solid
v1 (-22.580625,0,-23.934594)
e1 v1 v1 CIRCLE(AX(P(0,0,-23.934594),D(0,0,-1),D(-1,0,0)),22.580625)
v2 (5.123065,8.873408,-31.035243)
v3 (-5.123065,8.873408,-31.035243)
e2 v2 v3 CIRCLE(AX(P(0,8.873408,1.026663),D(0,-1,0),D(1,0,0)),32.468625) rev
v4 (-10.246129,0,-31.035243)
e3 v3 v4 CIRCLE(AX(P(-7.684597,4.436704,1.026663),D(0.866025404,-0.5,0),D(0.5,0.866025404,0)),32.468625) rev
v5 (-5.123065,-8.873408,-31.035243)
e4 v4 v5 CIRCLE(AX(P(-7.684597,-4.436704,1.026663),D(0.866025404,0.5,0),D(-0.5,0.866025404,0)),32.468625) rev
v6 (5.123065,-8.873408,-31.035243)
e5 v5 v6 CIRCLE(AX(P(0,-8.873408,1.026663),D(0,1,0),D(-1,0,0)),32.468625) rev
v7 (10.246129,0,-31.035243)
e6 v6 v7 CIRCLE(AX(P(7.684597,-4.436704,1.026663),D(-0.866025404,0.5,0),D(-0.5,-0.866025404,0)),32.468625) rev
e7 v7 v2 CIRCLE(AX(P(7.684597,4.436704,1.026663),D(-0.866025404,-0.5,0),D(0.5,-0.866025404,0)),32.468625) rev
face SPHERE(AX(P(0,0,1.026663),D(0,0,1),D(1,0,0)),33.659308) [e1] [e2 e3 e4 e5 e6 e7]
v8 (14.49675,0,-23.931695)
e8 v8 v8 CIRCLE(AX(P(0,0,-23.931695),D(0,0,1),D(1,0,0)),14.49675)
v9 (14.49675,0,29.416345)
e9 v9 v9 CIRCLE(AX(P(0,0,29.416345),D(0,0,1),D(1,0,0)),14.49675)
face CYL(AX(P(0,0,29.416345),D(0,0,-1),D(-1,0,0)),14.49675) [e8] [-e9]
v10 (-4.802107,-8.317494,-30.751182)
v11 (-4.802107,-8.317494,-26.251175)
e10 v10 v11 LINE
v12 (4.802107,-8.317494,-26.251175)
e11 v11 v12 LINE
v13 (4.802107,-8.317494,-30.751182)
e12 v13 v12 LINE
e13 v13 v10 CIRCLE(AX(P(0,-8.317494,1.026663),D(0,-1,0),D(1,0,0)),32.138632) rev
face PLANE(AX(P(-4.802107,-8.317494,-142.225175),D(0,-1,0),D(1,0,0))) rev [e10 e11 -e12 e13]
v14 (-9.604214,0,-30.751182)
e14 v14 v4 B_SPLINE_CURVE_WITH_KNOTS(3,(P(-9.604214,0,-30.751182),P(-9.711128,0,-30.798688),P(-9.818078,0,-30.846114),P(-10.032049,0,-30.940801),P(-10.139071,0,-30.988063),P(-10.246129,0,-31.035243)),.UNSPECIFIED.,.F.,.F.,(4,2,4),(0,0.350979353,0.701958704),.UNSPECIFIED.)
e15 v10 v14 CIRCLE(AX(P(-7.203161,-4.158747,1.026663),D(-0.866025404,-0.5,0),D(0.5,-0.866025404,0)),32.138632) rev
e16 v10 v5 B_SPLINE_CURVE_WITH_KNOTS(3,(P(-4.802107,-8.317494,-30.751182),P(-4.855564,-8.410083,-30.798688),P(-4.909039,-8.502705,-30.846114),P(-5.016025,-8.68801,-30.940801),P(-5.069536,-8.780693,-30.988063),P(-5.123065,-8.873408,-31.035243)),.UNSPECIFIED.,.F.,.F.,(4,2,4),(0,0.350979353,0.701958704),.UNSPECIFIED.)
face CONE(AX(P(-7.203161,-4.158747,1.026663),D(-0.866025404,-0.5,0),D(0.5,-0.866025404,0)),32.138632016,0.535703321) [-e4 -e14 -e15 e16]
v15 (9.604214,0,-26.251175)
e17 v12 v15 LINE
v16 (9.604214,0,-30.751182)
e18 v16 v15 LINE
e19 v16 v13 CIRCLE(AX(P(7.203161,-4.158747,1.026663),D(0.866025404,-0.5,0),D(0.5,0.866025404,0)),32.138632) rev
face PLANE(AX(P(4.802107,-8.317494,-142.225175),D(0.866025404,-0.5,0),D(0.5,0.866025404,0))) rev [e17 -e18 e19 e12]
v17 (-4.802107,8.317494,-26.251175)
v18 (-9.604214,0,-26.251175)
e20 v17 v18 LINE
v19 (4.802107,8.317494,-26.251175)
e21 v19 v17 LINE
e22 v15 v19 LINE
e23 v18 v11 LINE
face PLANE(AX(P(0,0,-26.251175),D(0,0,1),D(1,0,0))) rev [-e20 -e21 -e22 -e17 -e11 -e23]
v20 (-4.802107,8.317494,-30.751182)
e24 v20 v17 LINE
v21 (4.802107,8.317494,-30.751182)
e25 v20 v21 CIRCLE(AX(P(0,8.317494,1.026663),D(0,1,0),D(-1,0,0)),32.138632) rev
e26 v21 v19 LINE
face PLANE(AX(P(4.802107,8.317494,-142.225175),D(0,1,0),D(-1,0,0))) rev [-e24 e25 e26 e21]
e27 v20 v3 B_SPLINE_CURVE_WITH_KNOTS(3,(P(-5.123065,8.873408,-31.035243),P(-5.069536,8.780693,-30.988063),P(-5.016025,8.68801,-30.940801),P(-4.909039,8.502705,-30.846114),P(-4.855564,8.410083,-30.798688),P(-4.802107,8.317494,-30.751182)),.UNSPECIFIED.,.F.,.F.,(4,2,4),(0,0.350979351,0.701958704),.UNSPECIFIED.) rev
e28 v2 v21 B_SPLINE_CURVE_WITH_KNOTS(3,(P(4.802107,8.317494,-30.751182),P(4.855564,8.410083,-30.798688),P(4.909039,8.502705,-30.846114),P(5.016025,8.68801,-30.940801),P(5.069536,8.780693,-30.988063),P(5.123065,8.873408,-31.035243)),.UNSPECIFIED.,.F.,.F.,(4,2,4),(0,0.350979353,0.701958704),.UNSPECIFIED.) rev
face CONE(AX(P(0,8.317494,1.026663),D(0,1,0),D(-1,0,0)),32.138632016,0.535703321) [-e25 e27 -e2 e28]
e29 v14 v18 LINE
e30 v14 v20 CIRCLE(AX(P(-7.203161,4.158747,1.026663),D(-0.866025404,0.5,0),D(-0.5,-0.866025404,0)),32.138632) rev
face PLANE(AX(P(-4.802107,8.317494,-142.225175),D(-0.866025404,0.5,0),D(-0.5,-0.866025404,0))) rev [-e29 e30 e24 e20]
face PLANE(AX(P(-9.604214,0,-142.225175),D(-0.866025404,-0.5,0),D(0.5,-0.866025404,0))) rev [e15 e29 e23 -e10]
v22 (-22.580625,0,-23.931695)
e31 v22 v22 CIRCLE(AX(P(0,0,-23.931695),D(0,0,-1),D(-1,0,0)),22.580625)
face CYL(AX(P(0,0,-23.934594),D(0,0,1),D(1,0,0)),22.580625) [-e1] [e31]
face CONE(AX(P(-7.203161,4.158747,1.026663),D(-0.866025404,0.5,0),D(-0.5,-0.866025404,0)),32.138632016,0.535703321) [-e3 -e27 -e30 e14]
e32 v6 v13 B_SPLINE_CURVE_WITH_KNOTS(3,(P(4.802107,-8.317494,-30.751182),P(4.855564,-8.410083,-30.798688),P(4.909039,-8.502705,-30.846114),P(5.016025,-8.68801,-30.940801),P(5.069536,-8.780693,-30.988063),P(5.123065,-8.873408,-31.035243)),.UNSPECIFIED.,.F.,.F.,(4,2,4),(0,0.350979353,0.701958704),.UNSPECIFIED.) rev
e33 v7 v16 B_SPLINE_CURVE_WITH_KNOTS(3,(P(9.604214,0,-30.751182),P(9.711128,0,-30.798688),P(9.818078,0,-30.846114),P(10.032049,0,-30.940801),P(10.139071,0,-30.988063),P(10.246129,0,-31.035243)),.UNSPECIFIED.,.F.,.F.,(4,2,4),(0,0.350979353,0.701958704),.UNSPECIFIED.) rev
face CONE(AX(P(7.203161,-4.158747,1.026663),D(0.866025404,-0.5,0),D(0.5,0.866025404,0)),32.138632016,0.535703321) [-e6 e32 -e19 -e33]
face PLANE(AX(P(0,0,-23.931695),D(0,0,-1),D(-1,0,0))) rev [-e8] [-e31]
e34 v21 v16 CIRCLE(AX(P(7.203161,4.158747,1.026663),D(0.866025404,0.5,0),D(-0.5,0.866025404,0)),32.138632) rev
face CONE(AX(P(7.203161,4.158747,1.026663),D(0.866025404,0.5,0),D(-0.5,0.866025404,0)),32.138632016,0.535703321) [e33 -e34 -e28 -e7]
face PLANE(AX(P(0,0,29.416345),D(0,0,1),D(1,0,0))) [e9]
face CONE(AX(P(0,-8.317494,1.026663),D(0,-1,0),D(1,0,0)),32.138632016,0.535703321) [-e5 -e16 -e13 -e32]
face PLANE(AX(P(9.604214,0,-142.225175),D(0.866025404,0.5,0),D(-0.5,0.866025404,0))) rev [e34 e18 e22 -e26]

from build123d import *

# Parameters (mm, degrees)
SKETCH1_R           = 5
BOSS_EXTRUDE1_DEPTH = 9.2
SKETCH2_R           = 7.788167924
BOSS_EXTRUDE2_DEPTH = 0.001
DOME1_FACE_RADIUS   = 7.788167924
DOME1_HEIGHT        = 3
CUT_EXTRUDE1_START  = -10
CUT_EXTRUDE1_DEPTH  = 40
CHAMFER2_SIZE       = 0.16446068
SCALE1_SCALE        = 1.9329
SCALE2_SCALE        = 1.5


with BuildPart() as part:
    # Sketch1 → Boss-Extrude1 (new, symmetric)
    with BuildSketch(Plane.XY):
        Circle(SKETCH1_R)
    extrude(amount=BOSS_EXTRUDE1_DEPTH, both=True)

    # Sketch2 → Boss-Extrude2 (add)
    with BuildSketch(Plane(origin=(0, 0, -9.2), x_dir=(-1, 0, 0), z_dir=(0, 0, -1))):
        Circle(SKETCH2_R)
    extrude(amount=BOSS_EXTRUDE2_DEPTH)

    # Dome1: a dome of height H over a round flat face of radius A is a cap of a sphere of radius (A * A + H * H) / (2 * H)
    dome1_r = (DOME1_FACE_RADIUS * DOME1_FACE_RADIUS + DOME1_HEIGHT * DOME1_HEIGHT) / (2 * DOME1_HEIGHT)
    dome1_base = Plane((0, 0, -9.201), z_dir=(0, 0, -1))
    with Locations(dome1_base.offset(DOME1_HEIGHT - dome1_r)):
        dome1_ball = Sphere(dome1_r, mode=Mode.PRIVATE)
    add(split(dome1_ball, bisect_by=dome1_base, keep=Keep.TOP, mode=Mode.PRIVATE))

    # Sketch3 → Cut-Extrude1 (cut)
    with BuildSketch(Plane.XY.offset(CUT_EXTRUDE1_START)):
        Polygon((-3.312540498, 0), (-1.656270249, -2.868744223), (1.656270249, -2.868744223), (3.312540498, 0), (1.656270249, 2.868744223), (-1.656270249, 2.868744223), align=None)
    extrude(amount=-CUT_EXTRUDE1_DEPTH, mode=Mode.SUBTRACT)

    # Chamfer2
    # the kernel refuses this chamfer: 0.2, 0.16446068 mm, written as the material it takes off along each edge
    with BuildSketch(Plane(origin=(-2.484405374, -1.434372111, -0.591740065), x_dir=(-0.09595536386249687, 0.16619956546860265, -0.9814123866061929), z_dir=(-0.49070619330309756, 0.8499280583896772, 0.1919107277249933))) as chamfer2_piece_1_section:
        with BuildLine():
            Line((11.198587704, 0.191737716), (11.2492321 - CHAMFER2_SIZE, 0))
            Line((11.2492321 - CHAMFER2_SIZE, 0), (11.2492321, 0))
            ThreePointArc((11.2492321, 0), (11.223603032, 0.098687532), (11.198587704, 0.191737716))
        make_face()
    chamfer2_piece_1 = revolve(axis=Axis((-2.484405374, -1.434372111, -0.591740065), (-0.866025403784438, -0.5000000000000011, 0)), revolution_arc=22.128626255, mode=Mode.PRIVATE)
    chamfer2_piece_1 = split(chamfer2_piece_1, bisect_by=Plane(origin=(-3.726608061, -0.717186056, -0.591740065), z_dir=(0.8660254037844416, -0.499999999999995, 0)), keep=Keep.TOP, mode=Mode.PRIVATE)
    chamfer2_piece_1 = split(chamfer2_piece_1, bisect_by=Plane(origin=(-2.484405374, -2.868744223, -0.591740065), z_dir=(0, 1, 0)), keep=Keep.TOP, mode=Mode.PRIVATE)
    add(chamfer2_piece_1, mode=Mode.SUBTRACT)
    with BuildSketch(Plane(origin=(0, -2.868744223, -0.591740065), x_dir=(-0.1919107277249941, 0, -0.9814123866061928), z_dir=(-0.9814123866061928, -3.420849025073354e-15, 0.1919107277249941))) as chamfer2_piece_2_section:
        with BuildLine():
            Line((11.198587704, 0.191737716), (11.2492321 - CHAMFER2_SIZE, 0))
            Line((11.2492321 - CHAMFER2_SIZE, 0), (11.2492321, 0))
            ThreePointArc((11.2492321, 0), (11.223603032, 0.098687532), (11.198587704, 0.191737716))
        make_face()
    chamfer2_piece_2 = revolve(axis=Axis((0, -2.868744223, -0.591740065), (0, -1, 0)), revolution_arc=22.128626255, mode=Mode.PRIVATE)
    chamfer2_piece_2 = split(chamfer2_piece_2, bisect_by=Plane(origin=(1.242202687, -3.585930278, -0.591740065), z_dir=(-0.8660254037844415, 0.49999999999999506, 0)), keep=Keep.TOP, mode=Mode.PRIVATE)
    chamfer2_piece_2 = split(chamfer2_piece_2, bisect_by=Plane(origin=(-1.242202687, -3.585930278, -0.591740065), z_dir=(0.866025403784438, 0.5000000000000011, 0)), keep=Keep.TOP, mode=Mode.PRIVATE)
    add(chamfer2_piece_2, mode=Mode.SUBTRACT)
    with BuildSketch(Plane(origin=(2.484405374, -1.434372111, -0.591740065), x_dir=(-0.09595536386249569, -0.16619956546860332, -0.9814123866061929), z_dir=(-0.4907061933030916, -0.8499280583896806, 0.1919107277249933))) as chamfer2_piece_3_section:
        with BuildLine():
            Line((11.198587704, 0.191737716), (11.2492321 - CHAMFER2_SIZE, 0))
            Line((11.2492321 - CHAMFER2_SIZE, 0), (11.2492321, 0))
            ThreePointArc((11.2492321, 0), (11.223603032, 0.098687532), (11.198587704, 0.191737716))
        make_face()
    chamfer2_piece_3 = revolve(axis=Axis((2.484405374, -1.434372111, -0.591740065), (0.8660254037844415, -0.49999999999999506, 0)), revolution_arc=22.128626255, mode=Mode.PRIVATE)
    chamfer2_piece_3 = split(chamfer2_piece_3, bisect_by=Plane(origin=(3.726608061, -0.717186056, -0.591740065), z_dir=(-0.8660254037844346, -0.5000000000000072, 0)), keep=Keep.TOP, mode=Mode.PRIVATE)
    chamfer2_piece_3 = split(chamfer2_piece_3, bisect_by=Plane(origin=(2.484405374, -2.868744223, -0.591740065), z_dir=(0, 1, 0)), keep=Keep.TOP, mode=Mode.PRIVATE)
    add(chamfer2_piece_3, mode=Mode.SUBTRACT)
    with BuildSketch(Plane(origin=(2.484405374, 1.434372111, -0.591740065), x_dir=(0.09595536386249802, -0.16619956546860198, -0.9814123866061929), z_dir=(0.49070619330310355, -0.8499280583896739, 0.19191072772499332))) as chamfer2_piece_4_section:
        with BuildLine():
            Line((11.198587704, 0.191737716), (11.2492321 - CHAMFER2_SIZE, 0))
            Line((11.2492321 - CHAMFER2_SIZE, 0), (11.2492321, 0))
            ThreePointArc((11.2492321, 0), (11.223603032, 0.098687532), (11.198587704, 0.191737716))
        make_face()
    chamfer2_piece_4 = revolve(axis=Axis((2.484405374, 1.434372111, -0.591740065), (0.8660254037844346, 0.5000000000000072, 0)), revolution_arc=22.128626255, mode=Mode.PRIVATE)
    chamfer2_piece_4 = split(chamfer2_piece_4, bisect_by=Plane(origin=(2.484405374, 2.868744223, -0.591740065), z_dir=(0, -1, 0)), keep=Keep.TOP, mode=Mode.PRIVATE)
    chamfer2_piece_4 = split(chamfer2_piece_4, bisect_by=Plane(origin=(3.726608061, 0.717186056, -0.591740065), z_dir=(-0.8660254037844415, 0.49999999999999506, 0)), keep=Keep.TOP, mode=Mode.PRIVATE)
    add(chamfer2_piece_4, mode=Mode.SUBTRACT)
    with BuildSketch(Plane(origin=(0, 2.868744223, -0.591740065), x_dir=(0.1919107277249941, 1.9738645532128006e-15, -0.9814123866061928), z_dir=(0.9814123866061928, 1.0130975958871086e-14, 0.1919107277249941))) as chamfer2_piece_5_section:
        with BuildLine():
            Line((11.198587704, 0.191737716), (11.2492321 - CHAMFER2_SIZE, 0))
            Line((11.2492321 - CHAMFER2_SIZE, 0), (11.2492321, 0))
            ThreePointArc((11.2492321, 0), (11.223603032, 0.098687532), (11.198587704, 0.191737716))
        make_face()
    chamfer2_piece_5 = revolve(axis=Axis((0, 2.868744223, -0.591740065), (0, 1, 0)), revolution_arc=22.128626255, mode=Mode.PRIVATE)
    chamfer2_piece_5 = split(chamfer2_piece_5, bisect_by=Plane(origin=(-1.242202687, 3.585930278, -0.591740065), z_dir=(0.8660254037844416, -0.499999999999995, 0)), keep=Keep.TOP, mode=Mode.PRIVATE)
    chamfer2_piece_5 = split(chamfer2_piece_5, bisect_by=Plane(origin=(1.242202687, 3.585930278, -0.591740065), z_dir=(-0.8660254037844346, -0.5000000000000072, 0)), keep=Keep.TOP, mode=Mode.PRIVATE)
    add(chamfer2_piece_5, mode=Mode.SUBTRACT)
    with BuildSketch(Plane(origin=(-2.484405374, 1.434372111, -0.591740065), x_dir=(0.09595536386249523, 0.16619956546860257, -0.981412386606193), z_dir=(0.4907061933030916, 0.8499280583896808, 0.1919107277249924))) as chamfer2_piece_6_section:
        with BuildLine():
            Line((11.198587704, 0.191737716), (11.2492321 - CHAMFER2_SIZE, 0))
            Line((11.2492321 - CHAMFER2_SIZE, 0), (11.2492321, 0))
            ThreePointArc((11.2492321, 0), (11.223603032, 0.098687532), (11.198587704, 0.191737716))
        make_face()
    chamfer2_piece_6 = revolve(axis=Axis((-2.484405374, 1.434372111, -0.591740065), (-0.8660254037844416, 0.499999999999995, 0)), revolution_arc=22.128626255, mode=Mode.PRIVATE)
    chamfer2_piece_6 = split(chamfer2_piece_6, bisect_by=Plane(origin=(-2.484405374, 2.868744223, -0.591740065), z_dir=(0, -1, 0)), keep=Keep.TOP, mode=Mode.PRIVATE)
    chamfer2_piece_6 = split(chamfer2_piece_6, bisect_by=Plane(origin=(-3.726608061, 0.717186056, -0.591740065), z_dir=(0.866025403784438, 0.5000000000000011, 0)), keep=Keep.TOP, mode=Mode.PRIVATE)
    add(chamfer2_piece_6, mode=Mode.SUBTRACT)
    with BuildSketch(Plane(origin=(-2.484405374, 1.434372111, -0.591740065), x_dir=(0.09595536386249523, 0.16619956546860257, -0.981412386606193), z_dir=(0.4907061933030916, 0.8499280583896808, 0.1919107277249924))) as chamfer2_piece_7a_section:
        with BuildLine():
            Line((11.198587704, 0.191737716), (11.2492321 - CHAMFER2_SIZE, 0))
            Line((11.2492321 - CHAMFER2_SIZE, 0), (11.2492321, 0))
            ThreePointArc((11.2492321, 0), (11.223603032, 0.098687532), (11.198587704, 0.191737716))
        make_face()
    chamfer2_piece_7a = revolve(axis=Axis((-2.484405374, 1.434372111, -0.591740065), (-0.8660254037844416, 0.499999999999995, 0)), revolution_arc=22.128626255, mode=Mode.PRIVATE)
    chamfer2_piece_7a = split(chamfer2_piece_7a, bisect_by=Plane(origin=(-3.726608061, 0.717186056, -0.591740065), z_dir=(-0.866025403784438, -0.5000000000000011, 0)), keep=Keep.TOP, mode=Mode.PRIVATE)
    with BuildSketch(Plane(origin=(-2.484405374, -1.434372111, -0.591740065), x_dir=(-0.09595536386249687, 0.16619956546860265, -0.9814123866061929), z_dir=(-0.49070619330309756, 0.8499280583896772, 0.1919107277249933))) as chamfer2_piece_7b_section:
        with BuildLine():
            Line((11.198587704, 0.191737716), (11.2492321 - CHAMFER2_SIZE, 0))
            Line((11.2492321 - CHAMFER2_SIZE, 0), (11.2492321, 0))
            ThreePointArc((11.2492321, 0), (11.223603032, 0.098687532), (11.198587704, 0.191737716))
        make_face()
    chamfer2_piece_7b = revolve(axis=Axis((-2.484405374, -1.434372111, -0.591740065), (-0.866025403784438, -0.5000000000000011, 0)), revolution_arc=22.128626255, mode=Mode.PRIVATE)
    chamfer2_piece_7b = split(chamfer2_piece_7b, bisect_by=Plane(origin=(-3.726608061, -0.717186056, -0.591740065), z_dir=(-0.8660254037844416, 0.499999999999995, 0)), keep=Keep.TOP, mode=Mode.PRIVATE)
    chamfer2_piece_7 = chamfer2_piece_7a & chamfer2_piece_7b
    add(chamfer2_piece_7, mode=Mode.SUBTRACT)
    with BuildSketch(Plane(origin=(0, -2.868744223, -0.591740065), x_dir=(-0.1919107277249941, 0, -0.9814123866061928), z_dir=(-0.9814123866061928, -3.420849025073354e-15, 0.1919107277249941))) as chamfer2_piece_8a_section:
        with BuildLine():
            Line((11.198587704, 0.191737716), (11.2492321 - CHAMFER2_SIZE, 0))
            Line((11.2492321 - CHAMFER2_SIZE, 0), (11.2492321, 0))
            ThreePointArc((11.2492321, 0), (11.223603032, 0.098687532), (11.198587704, 0.191737716))
        make_face()
    chamfer2_piece_8a = revolve(axis=Axis((0, -2.868744223, -0.591740065), (0, -1, 0)), revolution_arc=22.128626255, mode=Mode.PRIVATE)
    chamfer2_piece_8a = split(chamfer2_piece_8a, bisect_by=Plane(origin=(-1.242202687, -3.585930278, -0.591740065), z_dir=(-0.866025403784438, -0.5000000000000011, 0)), keep=Keep.TOP, mode=Mode.PRIVATE)
    with BuildSketch(Plane(origin=(-2.484405374, -1.434372111, -0.591740065), x_dir=(-0.09595536386249687, 0.16619956546860265, -0.9814123866061929), z_dir=(-0.49070619330309756, 0.8499280583896772, 0.1919107277249933))) as chamfer2_piece_8b_section:
        with BuildLine():
            Line((11.198587704, 0.191737716), (11.2492321 - CHAMFER2_SIZE, 0))
            Line((11.2492321 - CHAMFER2_SIZE, 0), (11.2492321, 0))
            ThreePointArc((11.2492321, 0), (11.223603032, 0.098687532), (11.198587704, 0.191737716))
        make_face()
    chamfer2_piece_8b = revolve(axis=Axis((-2.484405374, -1.434372111, -0.591740065), (-0.866025403784438, -0.5000000000000011, 0)), revolution_arc=22.128626255, mode=Mode.PRIVATE)
    chamfer2_piece_8b = split(chamfer2_piece_8b, bisect_by=Plane(origin=(-2.484405374, -2.868744223, -0.591740065), z_dir=(0, -1, 0)), keep=Keep.TOP, mode=Mode.PRIVATE)
    chamfer2_piece_8 = chamfer2_piece_8a & chamfer2_piece_8b
    add(chamfer2_piece_8, mode=Mode.SUBTRACT)
    with BuildSketch(Plane(origin=(2.484405374, -1.434372111, -0.591740065), x_dir=(-0.09595536386249569, -0.16619956546860332, -0.9814123866061929), z_dir=(-0.4907061933030916, -0.8499280583896806, 0.1919107277249933))) as chamfer2_piece_9a_section:
        with BuildLine():
            Line((11.198587704, 0.191737716), (11.2492321 - CHAMFER2_SIZE, 0))
            Line((11.2492321 - CHAMFER2_SIZE, 0), (11.2492321, 0))
            ThreePointArc((11.2492321, 0), (11.223603032, 0.098687532), (11.198587704, 0.191737716))
        make_face()
    chamfer2_piece_9a = revolve(axis=Axis((2.484405374, -1.434372111, -0.591740065), (0.8660254037844415, -0.49999999999999506, 0)), revolution_arc=22.128626255, mode=Mode.PRIVATE)
    chamfer2_piece_9a = split(chamfer2_piece_9a, bisect_by=Plane(origin=(2.484405374, -2.868744223, -0.591740065), z_dir=(0, -1, 0)), keep=Keep.TOP, mode=Mode.PRIVATE)
    with BuildSketch(Plane(origin=(0, -2.868744223, -0.591740065), x_dir=(-0.1919107277249941, 0, -0.9814123866061928), z_dir=(-0.9814123866061928, -3.420849025073354e-15, 0.1919107277249941))) as chamfer2_piece_9b_section:
        with BuildLine():
            Line((11.198587704, 0.191737716), (11.2492321 - CHAMFER2_SIZE, 0))
            Line((11.2492321 - CHAMFER2_SIZE, 0), (11.2492321, 0))
            ThreePointArc((11.2492321, 0), (11.223603032, 0.098687532), (11.198587704, 0.191737716))
        make_face()
    chamfer2_piece_9b = revolve(axis=Axis((0, -2.868744223, -0.591740065), (0, -1, 0)), revolution_arc=22.128626255, mode=Mode.PRIVATE)
    chamfer2_piece_9b = split(chamfer2_piece_9b, bisect_by=Plane(origin=(1.242202687, -3.585930278, -0.591740065), z_dir=(0.8660254037844415, -0.49999999999999506, 0)), keep=Keep.TOP, mode=Mode.PRIVATE)
    chamfer2_piece_9 = chamfer2_piece_9a & chamfer2_piece_9b
    add(chamfer2_piece_9, mode=Mode.SUBTRACT)
    with BuildSketch(Plane(origin=(2.484405374, 1.434372111, -0.591740065), x_dir=(0.09595536386249802, -0.16619956546860198, -0.9814123866061929), z_dir=(0.49070619330310355, -0.8499280583896739, 0.19191072772499332))) as chamfer2_piece_10a_section:
        with BuildLine():
            Line((11.198587704, 0.191737716), (11.2492321 - CHAMFER2_SIZE, 0))
            Line((11.2492321 - CHAMFER2_SIZE, 0), (11.2492321, 0))
            ThreePointArc((11.2492321, 0), (11.223603032, 0.098687532), (11.198587704, 0.191737716))
        make_face()
    chamfer2_piece_10a = revolve(axis=Axis((2.484405374, 1.434372111, -0.591740065), (0.8660254037844346, 0.5000000000000072, 0)), revolution_arc=22.128626255, mode=Mode.PRIVATE)
    chamfer2_piece_10a = split(chamfer2_piece_10a, bisect_by=Plane(origin=(3.726608061, 0.717186056, -0.591740065), z_dir=(0.8660254037844415, -0.49999999999999506, 0)), keep=Keep.TOP, mode=Mode.PRIVATE)
    with BuildSketch(Plane(origin=(2.484405374, -1.434372111, -0.591740065), x_dir=(-0.09595536386249569, -0.16619956546860332, -0.9814123866061929), z_dir=(-0.4907061933030916, -0.8499280583896806, 0.1919107277249933))) as chamfer2_piece_10b_section:
        with BuildLine():
            Line((11.198587704, 0.191737716), (11.2492321 - CHAMFER2_SIZE, 0))
            Line((11.2492321 - CHAMFER2_SIZE, 0), (11.2492321, 0))
            ThreePointArc((11.2492321, 0), (11.223603032, 0.098687532), (11.198587704, 0.191737716))
        make_face()
    chamfer2_piece_10b = revolve(axis=Axis((2.484405374, -1.434372111, -0.591740065), (0.8660254037844415, -0.49999999999999506, 0)), revolution_arc=22.128626255, mode=Mode.PRIVATE)
    chamfer2_piece_10b = split(chamfer2_piece_10b, bisect_by=Plane(origin=(3.726608061, -0.717186056, -0.591740065), z_dir=(0.8660254037844346, 0.5000000000000072, 0)), keep=Keep.TOP, mode=Mode.PRIVATE)
    chamfer2_piece_10 = chamfer2_piece_10a & chamfer2_piece_10b
    add(chamfer2_piece_10, mode=Mode.SUBTRACT)
    with BuildSketch(Plane(origin=(0, 2.868744223, -0.591740065), x_dir=(0.1919107277249941, 1.9738645532128006e-15, -0.9814123866061928), z_dir=(0.9814123866061928, 1.0130975958871086e-14, 0.1919107277249941))) as chamfer2_piece_11a_section:
        with BuildLine():
            Line((11.198587704, 0.191737716), (11.2492321 - CHAMFER2_SIZE, 0))
            Line((11.2492321 - CHAMFER2_SIZE, 0), (11.2492321, 0))
            ThreePointArc((11.2492321, 0), (11.223603032, 0.098687532), (11.198587704, 0.191737716))
        make_face()
    chamfer2_piece_11a = revolve(axis=Axis((0, 2.868744223, -0.591740065), (0, 1, 0)), revolution_arc=22.128626255, mode=Mode.PRIVATE)
    chamfer2_piece_11a = split(chamfer2_piece_11a, bisect_by=Plane(origin=(1.242202687, 3.585930278, -0.591740065), z_dir=(0.8660254037844346, 0.5000000000000072, 0)), keep=Keep.TOP, mode=Mode.PRIVATE)
    with BuildSketch(Plane(origin=(2.484405374, 1.434372111, -0.591740065), x_dir=(0.09595536386249802, -0.16619956546860198, -0.9814123866061929), z_dir=(0.49070619330310355, -0.8499280583896739, 0.19191072772499332))) as chamfer2_piece_11b_section:
        with BuildLine():
            Line((11.198587704, 0.191737716), (11.2492321 - CHAMFER2_SIZE, 0))
            Line((11.2492321 - CHAMFER2_SIZE, 0), (11.2492321, 0))
            ThreePointArc((11.2492321, 0), (11.223603032, 0.098687532), (11.198587704, 0.191737716))
        make_face()
    chamfer2_piece_11b = revolve(axis=Axis((2.484405374, 1.434372111, -0.591740065), (0.8660254037844346, 0.5000000000000072, 0)), revolution_arc=22.128626255, mode=Mode.PRIVATE)
    chamfer2_piece_11b = split(chamfer2_piece_11b, bisect_by=Plane(origin=(2.484405374, 2.868744223, -0.591740065), z_dir=(0, 1, 0)), keep=Keep.TOP, mode=Mode.PRIVATE)
    chamfer2_piece_11 = chamfer2_piece_11a & chamfer2_piece_11b
    add(chamfer2_piece_11, mode=Mode.SUBTRACT)
    with BuildSketch(Plane(origin=(-2.484405374, 1.434372111, -0.591740065), x_dir=(0.09595536386249523, 0.16619956546860257, -0.981412386606193), z_dir=(0.4907061933030916, 0.8499280583896808, 0.1919107277249924))) as chamfer2_piece_12a_section:
        with BuildLine():
            Line((11.198587704, 0.191737716), (11.2492321 - CHAMFER2_SIZE, 0))
            Line((11.2492321 - CHAMFER2_SIZE, 0), (11.2492321, 0))
            ThreePointArc((11.2492321, 0), (11.223603032, 0.098687532), (11.198587704, 0.191737716))
        make_face()
    chamfer2_piece_12a = revolve(axis=Axis((-2.484405374, 1.434372111, -0.591740065), (-0.8660254037844416, 0.499999999999995, 0)), revolution_arc=22.128626255, mode=Mode.PRIVATE)
    chamfer2_piece_12a = split(chamfer2_piece_12a, bisect_by=Plane(origin=(-2.484405374, 2.868744223, -0.591740065), z_dir=(0, 1, 0)), keep=Keep.TOP, mode=Mode.PRIVATE)
    with BuildSketch(Plane(origin=(0, 2.868744223, -0.591740065), x_dir=(0.1919107277249941, 1.9738645532128006e-15, -0.9814123866061928), z_dir=(0.9814123866061928, 1.0130975958871086e-14, 0.1919107277249941))) as chamfer2_piece_12b_section:
        with BuildLine():
            Line((11.198587704, 0.191737716), (11.2492321 - CHAMFER2_SIZE, 0))
            Line((11.2492321 - CHAMFER2_SIZE, 0), (11.2492321, 0))
            ThreePointArc((11.2492321, 0), (11.223603032, 0.098687532), (11.198587704, 0.191737716))
        make_face()
    chamfer2_piece_12b = revolve(axis=Axis((0, 2.868744223, -0.591740065), (0, 1, 0)), revolution_arc=22.128626255, mode=Mode.PRIVATE)
    chamfer2_piece_12b = split(chamfer2_piece_12b, bisect_by=Plane(origin=(-1.242202687, 3.585930278, -0.591740065), z_dir=(-0.8660254037844416, 0.499999999999995, 0)), keep=Keep.TOP, mode=Mode.PRIVATE)
    chamfer2_piece_12 = chamfer2_piece_12a & chamfer2_piece_12b
    add(chamfer2_piece_12, mode=Mode.SUBTRACT)


with BuildPart() as part_1:
    # Scale1: scaled about (0, 0, -1.443824767)
    add(part.part.scale(SCALE1_SCALE).moved(Location((0, 0, 1.346944125))))


with BuildPart() as part_2:
    # Scale2: scaled about (0, 0, -1.443824767)
    add(part_1.part.scale(SCALE2_SCALE).moved(Location((0, 0, 0.721912383))))


solid = part_2.part
